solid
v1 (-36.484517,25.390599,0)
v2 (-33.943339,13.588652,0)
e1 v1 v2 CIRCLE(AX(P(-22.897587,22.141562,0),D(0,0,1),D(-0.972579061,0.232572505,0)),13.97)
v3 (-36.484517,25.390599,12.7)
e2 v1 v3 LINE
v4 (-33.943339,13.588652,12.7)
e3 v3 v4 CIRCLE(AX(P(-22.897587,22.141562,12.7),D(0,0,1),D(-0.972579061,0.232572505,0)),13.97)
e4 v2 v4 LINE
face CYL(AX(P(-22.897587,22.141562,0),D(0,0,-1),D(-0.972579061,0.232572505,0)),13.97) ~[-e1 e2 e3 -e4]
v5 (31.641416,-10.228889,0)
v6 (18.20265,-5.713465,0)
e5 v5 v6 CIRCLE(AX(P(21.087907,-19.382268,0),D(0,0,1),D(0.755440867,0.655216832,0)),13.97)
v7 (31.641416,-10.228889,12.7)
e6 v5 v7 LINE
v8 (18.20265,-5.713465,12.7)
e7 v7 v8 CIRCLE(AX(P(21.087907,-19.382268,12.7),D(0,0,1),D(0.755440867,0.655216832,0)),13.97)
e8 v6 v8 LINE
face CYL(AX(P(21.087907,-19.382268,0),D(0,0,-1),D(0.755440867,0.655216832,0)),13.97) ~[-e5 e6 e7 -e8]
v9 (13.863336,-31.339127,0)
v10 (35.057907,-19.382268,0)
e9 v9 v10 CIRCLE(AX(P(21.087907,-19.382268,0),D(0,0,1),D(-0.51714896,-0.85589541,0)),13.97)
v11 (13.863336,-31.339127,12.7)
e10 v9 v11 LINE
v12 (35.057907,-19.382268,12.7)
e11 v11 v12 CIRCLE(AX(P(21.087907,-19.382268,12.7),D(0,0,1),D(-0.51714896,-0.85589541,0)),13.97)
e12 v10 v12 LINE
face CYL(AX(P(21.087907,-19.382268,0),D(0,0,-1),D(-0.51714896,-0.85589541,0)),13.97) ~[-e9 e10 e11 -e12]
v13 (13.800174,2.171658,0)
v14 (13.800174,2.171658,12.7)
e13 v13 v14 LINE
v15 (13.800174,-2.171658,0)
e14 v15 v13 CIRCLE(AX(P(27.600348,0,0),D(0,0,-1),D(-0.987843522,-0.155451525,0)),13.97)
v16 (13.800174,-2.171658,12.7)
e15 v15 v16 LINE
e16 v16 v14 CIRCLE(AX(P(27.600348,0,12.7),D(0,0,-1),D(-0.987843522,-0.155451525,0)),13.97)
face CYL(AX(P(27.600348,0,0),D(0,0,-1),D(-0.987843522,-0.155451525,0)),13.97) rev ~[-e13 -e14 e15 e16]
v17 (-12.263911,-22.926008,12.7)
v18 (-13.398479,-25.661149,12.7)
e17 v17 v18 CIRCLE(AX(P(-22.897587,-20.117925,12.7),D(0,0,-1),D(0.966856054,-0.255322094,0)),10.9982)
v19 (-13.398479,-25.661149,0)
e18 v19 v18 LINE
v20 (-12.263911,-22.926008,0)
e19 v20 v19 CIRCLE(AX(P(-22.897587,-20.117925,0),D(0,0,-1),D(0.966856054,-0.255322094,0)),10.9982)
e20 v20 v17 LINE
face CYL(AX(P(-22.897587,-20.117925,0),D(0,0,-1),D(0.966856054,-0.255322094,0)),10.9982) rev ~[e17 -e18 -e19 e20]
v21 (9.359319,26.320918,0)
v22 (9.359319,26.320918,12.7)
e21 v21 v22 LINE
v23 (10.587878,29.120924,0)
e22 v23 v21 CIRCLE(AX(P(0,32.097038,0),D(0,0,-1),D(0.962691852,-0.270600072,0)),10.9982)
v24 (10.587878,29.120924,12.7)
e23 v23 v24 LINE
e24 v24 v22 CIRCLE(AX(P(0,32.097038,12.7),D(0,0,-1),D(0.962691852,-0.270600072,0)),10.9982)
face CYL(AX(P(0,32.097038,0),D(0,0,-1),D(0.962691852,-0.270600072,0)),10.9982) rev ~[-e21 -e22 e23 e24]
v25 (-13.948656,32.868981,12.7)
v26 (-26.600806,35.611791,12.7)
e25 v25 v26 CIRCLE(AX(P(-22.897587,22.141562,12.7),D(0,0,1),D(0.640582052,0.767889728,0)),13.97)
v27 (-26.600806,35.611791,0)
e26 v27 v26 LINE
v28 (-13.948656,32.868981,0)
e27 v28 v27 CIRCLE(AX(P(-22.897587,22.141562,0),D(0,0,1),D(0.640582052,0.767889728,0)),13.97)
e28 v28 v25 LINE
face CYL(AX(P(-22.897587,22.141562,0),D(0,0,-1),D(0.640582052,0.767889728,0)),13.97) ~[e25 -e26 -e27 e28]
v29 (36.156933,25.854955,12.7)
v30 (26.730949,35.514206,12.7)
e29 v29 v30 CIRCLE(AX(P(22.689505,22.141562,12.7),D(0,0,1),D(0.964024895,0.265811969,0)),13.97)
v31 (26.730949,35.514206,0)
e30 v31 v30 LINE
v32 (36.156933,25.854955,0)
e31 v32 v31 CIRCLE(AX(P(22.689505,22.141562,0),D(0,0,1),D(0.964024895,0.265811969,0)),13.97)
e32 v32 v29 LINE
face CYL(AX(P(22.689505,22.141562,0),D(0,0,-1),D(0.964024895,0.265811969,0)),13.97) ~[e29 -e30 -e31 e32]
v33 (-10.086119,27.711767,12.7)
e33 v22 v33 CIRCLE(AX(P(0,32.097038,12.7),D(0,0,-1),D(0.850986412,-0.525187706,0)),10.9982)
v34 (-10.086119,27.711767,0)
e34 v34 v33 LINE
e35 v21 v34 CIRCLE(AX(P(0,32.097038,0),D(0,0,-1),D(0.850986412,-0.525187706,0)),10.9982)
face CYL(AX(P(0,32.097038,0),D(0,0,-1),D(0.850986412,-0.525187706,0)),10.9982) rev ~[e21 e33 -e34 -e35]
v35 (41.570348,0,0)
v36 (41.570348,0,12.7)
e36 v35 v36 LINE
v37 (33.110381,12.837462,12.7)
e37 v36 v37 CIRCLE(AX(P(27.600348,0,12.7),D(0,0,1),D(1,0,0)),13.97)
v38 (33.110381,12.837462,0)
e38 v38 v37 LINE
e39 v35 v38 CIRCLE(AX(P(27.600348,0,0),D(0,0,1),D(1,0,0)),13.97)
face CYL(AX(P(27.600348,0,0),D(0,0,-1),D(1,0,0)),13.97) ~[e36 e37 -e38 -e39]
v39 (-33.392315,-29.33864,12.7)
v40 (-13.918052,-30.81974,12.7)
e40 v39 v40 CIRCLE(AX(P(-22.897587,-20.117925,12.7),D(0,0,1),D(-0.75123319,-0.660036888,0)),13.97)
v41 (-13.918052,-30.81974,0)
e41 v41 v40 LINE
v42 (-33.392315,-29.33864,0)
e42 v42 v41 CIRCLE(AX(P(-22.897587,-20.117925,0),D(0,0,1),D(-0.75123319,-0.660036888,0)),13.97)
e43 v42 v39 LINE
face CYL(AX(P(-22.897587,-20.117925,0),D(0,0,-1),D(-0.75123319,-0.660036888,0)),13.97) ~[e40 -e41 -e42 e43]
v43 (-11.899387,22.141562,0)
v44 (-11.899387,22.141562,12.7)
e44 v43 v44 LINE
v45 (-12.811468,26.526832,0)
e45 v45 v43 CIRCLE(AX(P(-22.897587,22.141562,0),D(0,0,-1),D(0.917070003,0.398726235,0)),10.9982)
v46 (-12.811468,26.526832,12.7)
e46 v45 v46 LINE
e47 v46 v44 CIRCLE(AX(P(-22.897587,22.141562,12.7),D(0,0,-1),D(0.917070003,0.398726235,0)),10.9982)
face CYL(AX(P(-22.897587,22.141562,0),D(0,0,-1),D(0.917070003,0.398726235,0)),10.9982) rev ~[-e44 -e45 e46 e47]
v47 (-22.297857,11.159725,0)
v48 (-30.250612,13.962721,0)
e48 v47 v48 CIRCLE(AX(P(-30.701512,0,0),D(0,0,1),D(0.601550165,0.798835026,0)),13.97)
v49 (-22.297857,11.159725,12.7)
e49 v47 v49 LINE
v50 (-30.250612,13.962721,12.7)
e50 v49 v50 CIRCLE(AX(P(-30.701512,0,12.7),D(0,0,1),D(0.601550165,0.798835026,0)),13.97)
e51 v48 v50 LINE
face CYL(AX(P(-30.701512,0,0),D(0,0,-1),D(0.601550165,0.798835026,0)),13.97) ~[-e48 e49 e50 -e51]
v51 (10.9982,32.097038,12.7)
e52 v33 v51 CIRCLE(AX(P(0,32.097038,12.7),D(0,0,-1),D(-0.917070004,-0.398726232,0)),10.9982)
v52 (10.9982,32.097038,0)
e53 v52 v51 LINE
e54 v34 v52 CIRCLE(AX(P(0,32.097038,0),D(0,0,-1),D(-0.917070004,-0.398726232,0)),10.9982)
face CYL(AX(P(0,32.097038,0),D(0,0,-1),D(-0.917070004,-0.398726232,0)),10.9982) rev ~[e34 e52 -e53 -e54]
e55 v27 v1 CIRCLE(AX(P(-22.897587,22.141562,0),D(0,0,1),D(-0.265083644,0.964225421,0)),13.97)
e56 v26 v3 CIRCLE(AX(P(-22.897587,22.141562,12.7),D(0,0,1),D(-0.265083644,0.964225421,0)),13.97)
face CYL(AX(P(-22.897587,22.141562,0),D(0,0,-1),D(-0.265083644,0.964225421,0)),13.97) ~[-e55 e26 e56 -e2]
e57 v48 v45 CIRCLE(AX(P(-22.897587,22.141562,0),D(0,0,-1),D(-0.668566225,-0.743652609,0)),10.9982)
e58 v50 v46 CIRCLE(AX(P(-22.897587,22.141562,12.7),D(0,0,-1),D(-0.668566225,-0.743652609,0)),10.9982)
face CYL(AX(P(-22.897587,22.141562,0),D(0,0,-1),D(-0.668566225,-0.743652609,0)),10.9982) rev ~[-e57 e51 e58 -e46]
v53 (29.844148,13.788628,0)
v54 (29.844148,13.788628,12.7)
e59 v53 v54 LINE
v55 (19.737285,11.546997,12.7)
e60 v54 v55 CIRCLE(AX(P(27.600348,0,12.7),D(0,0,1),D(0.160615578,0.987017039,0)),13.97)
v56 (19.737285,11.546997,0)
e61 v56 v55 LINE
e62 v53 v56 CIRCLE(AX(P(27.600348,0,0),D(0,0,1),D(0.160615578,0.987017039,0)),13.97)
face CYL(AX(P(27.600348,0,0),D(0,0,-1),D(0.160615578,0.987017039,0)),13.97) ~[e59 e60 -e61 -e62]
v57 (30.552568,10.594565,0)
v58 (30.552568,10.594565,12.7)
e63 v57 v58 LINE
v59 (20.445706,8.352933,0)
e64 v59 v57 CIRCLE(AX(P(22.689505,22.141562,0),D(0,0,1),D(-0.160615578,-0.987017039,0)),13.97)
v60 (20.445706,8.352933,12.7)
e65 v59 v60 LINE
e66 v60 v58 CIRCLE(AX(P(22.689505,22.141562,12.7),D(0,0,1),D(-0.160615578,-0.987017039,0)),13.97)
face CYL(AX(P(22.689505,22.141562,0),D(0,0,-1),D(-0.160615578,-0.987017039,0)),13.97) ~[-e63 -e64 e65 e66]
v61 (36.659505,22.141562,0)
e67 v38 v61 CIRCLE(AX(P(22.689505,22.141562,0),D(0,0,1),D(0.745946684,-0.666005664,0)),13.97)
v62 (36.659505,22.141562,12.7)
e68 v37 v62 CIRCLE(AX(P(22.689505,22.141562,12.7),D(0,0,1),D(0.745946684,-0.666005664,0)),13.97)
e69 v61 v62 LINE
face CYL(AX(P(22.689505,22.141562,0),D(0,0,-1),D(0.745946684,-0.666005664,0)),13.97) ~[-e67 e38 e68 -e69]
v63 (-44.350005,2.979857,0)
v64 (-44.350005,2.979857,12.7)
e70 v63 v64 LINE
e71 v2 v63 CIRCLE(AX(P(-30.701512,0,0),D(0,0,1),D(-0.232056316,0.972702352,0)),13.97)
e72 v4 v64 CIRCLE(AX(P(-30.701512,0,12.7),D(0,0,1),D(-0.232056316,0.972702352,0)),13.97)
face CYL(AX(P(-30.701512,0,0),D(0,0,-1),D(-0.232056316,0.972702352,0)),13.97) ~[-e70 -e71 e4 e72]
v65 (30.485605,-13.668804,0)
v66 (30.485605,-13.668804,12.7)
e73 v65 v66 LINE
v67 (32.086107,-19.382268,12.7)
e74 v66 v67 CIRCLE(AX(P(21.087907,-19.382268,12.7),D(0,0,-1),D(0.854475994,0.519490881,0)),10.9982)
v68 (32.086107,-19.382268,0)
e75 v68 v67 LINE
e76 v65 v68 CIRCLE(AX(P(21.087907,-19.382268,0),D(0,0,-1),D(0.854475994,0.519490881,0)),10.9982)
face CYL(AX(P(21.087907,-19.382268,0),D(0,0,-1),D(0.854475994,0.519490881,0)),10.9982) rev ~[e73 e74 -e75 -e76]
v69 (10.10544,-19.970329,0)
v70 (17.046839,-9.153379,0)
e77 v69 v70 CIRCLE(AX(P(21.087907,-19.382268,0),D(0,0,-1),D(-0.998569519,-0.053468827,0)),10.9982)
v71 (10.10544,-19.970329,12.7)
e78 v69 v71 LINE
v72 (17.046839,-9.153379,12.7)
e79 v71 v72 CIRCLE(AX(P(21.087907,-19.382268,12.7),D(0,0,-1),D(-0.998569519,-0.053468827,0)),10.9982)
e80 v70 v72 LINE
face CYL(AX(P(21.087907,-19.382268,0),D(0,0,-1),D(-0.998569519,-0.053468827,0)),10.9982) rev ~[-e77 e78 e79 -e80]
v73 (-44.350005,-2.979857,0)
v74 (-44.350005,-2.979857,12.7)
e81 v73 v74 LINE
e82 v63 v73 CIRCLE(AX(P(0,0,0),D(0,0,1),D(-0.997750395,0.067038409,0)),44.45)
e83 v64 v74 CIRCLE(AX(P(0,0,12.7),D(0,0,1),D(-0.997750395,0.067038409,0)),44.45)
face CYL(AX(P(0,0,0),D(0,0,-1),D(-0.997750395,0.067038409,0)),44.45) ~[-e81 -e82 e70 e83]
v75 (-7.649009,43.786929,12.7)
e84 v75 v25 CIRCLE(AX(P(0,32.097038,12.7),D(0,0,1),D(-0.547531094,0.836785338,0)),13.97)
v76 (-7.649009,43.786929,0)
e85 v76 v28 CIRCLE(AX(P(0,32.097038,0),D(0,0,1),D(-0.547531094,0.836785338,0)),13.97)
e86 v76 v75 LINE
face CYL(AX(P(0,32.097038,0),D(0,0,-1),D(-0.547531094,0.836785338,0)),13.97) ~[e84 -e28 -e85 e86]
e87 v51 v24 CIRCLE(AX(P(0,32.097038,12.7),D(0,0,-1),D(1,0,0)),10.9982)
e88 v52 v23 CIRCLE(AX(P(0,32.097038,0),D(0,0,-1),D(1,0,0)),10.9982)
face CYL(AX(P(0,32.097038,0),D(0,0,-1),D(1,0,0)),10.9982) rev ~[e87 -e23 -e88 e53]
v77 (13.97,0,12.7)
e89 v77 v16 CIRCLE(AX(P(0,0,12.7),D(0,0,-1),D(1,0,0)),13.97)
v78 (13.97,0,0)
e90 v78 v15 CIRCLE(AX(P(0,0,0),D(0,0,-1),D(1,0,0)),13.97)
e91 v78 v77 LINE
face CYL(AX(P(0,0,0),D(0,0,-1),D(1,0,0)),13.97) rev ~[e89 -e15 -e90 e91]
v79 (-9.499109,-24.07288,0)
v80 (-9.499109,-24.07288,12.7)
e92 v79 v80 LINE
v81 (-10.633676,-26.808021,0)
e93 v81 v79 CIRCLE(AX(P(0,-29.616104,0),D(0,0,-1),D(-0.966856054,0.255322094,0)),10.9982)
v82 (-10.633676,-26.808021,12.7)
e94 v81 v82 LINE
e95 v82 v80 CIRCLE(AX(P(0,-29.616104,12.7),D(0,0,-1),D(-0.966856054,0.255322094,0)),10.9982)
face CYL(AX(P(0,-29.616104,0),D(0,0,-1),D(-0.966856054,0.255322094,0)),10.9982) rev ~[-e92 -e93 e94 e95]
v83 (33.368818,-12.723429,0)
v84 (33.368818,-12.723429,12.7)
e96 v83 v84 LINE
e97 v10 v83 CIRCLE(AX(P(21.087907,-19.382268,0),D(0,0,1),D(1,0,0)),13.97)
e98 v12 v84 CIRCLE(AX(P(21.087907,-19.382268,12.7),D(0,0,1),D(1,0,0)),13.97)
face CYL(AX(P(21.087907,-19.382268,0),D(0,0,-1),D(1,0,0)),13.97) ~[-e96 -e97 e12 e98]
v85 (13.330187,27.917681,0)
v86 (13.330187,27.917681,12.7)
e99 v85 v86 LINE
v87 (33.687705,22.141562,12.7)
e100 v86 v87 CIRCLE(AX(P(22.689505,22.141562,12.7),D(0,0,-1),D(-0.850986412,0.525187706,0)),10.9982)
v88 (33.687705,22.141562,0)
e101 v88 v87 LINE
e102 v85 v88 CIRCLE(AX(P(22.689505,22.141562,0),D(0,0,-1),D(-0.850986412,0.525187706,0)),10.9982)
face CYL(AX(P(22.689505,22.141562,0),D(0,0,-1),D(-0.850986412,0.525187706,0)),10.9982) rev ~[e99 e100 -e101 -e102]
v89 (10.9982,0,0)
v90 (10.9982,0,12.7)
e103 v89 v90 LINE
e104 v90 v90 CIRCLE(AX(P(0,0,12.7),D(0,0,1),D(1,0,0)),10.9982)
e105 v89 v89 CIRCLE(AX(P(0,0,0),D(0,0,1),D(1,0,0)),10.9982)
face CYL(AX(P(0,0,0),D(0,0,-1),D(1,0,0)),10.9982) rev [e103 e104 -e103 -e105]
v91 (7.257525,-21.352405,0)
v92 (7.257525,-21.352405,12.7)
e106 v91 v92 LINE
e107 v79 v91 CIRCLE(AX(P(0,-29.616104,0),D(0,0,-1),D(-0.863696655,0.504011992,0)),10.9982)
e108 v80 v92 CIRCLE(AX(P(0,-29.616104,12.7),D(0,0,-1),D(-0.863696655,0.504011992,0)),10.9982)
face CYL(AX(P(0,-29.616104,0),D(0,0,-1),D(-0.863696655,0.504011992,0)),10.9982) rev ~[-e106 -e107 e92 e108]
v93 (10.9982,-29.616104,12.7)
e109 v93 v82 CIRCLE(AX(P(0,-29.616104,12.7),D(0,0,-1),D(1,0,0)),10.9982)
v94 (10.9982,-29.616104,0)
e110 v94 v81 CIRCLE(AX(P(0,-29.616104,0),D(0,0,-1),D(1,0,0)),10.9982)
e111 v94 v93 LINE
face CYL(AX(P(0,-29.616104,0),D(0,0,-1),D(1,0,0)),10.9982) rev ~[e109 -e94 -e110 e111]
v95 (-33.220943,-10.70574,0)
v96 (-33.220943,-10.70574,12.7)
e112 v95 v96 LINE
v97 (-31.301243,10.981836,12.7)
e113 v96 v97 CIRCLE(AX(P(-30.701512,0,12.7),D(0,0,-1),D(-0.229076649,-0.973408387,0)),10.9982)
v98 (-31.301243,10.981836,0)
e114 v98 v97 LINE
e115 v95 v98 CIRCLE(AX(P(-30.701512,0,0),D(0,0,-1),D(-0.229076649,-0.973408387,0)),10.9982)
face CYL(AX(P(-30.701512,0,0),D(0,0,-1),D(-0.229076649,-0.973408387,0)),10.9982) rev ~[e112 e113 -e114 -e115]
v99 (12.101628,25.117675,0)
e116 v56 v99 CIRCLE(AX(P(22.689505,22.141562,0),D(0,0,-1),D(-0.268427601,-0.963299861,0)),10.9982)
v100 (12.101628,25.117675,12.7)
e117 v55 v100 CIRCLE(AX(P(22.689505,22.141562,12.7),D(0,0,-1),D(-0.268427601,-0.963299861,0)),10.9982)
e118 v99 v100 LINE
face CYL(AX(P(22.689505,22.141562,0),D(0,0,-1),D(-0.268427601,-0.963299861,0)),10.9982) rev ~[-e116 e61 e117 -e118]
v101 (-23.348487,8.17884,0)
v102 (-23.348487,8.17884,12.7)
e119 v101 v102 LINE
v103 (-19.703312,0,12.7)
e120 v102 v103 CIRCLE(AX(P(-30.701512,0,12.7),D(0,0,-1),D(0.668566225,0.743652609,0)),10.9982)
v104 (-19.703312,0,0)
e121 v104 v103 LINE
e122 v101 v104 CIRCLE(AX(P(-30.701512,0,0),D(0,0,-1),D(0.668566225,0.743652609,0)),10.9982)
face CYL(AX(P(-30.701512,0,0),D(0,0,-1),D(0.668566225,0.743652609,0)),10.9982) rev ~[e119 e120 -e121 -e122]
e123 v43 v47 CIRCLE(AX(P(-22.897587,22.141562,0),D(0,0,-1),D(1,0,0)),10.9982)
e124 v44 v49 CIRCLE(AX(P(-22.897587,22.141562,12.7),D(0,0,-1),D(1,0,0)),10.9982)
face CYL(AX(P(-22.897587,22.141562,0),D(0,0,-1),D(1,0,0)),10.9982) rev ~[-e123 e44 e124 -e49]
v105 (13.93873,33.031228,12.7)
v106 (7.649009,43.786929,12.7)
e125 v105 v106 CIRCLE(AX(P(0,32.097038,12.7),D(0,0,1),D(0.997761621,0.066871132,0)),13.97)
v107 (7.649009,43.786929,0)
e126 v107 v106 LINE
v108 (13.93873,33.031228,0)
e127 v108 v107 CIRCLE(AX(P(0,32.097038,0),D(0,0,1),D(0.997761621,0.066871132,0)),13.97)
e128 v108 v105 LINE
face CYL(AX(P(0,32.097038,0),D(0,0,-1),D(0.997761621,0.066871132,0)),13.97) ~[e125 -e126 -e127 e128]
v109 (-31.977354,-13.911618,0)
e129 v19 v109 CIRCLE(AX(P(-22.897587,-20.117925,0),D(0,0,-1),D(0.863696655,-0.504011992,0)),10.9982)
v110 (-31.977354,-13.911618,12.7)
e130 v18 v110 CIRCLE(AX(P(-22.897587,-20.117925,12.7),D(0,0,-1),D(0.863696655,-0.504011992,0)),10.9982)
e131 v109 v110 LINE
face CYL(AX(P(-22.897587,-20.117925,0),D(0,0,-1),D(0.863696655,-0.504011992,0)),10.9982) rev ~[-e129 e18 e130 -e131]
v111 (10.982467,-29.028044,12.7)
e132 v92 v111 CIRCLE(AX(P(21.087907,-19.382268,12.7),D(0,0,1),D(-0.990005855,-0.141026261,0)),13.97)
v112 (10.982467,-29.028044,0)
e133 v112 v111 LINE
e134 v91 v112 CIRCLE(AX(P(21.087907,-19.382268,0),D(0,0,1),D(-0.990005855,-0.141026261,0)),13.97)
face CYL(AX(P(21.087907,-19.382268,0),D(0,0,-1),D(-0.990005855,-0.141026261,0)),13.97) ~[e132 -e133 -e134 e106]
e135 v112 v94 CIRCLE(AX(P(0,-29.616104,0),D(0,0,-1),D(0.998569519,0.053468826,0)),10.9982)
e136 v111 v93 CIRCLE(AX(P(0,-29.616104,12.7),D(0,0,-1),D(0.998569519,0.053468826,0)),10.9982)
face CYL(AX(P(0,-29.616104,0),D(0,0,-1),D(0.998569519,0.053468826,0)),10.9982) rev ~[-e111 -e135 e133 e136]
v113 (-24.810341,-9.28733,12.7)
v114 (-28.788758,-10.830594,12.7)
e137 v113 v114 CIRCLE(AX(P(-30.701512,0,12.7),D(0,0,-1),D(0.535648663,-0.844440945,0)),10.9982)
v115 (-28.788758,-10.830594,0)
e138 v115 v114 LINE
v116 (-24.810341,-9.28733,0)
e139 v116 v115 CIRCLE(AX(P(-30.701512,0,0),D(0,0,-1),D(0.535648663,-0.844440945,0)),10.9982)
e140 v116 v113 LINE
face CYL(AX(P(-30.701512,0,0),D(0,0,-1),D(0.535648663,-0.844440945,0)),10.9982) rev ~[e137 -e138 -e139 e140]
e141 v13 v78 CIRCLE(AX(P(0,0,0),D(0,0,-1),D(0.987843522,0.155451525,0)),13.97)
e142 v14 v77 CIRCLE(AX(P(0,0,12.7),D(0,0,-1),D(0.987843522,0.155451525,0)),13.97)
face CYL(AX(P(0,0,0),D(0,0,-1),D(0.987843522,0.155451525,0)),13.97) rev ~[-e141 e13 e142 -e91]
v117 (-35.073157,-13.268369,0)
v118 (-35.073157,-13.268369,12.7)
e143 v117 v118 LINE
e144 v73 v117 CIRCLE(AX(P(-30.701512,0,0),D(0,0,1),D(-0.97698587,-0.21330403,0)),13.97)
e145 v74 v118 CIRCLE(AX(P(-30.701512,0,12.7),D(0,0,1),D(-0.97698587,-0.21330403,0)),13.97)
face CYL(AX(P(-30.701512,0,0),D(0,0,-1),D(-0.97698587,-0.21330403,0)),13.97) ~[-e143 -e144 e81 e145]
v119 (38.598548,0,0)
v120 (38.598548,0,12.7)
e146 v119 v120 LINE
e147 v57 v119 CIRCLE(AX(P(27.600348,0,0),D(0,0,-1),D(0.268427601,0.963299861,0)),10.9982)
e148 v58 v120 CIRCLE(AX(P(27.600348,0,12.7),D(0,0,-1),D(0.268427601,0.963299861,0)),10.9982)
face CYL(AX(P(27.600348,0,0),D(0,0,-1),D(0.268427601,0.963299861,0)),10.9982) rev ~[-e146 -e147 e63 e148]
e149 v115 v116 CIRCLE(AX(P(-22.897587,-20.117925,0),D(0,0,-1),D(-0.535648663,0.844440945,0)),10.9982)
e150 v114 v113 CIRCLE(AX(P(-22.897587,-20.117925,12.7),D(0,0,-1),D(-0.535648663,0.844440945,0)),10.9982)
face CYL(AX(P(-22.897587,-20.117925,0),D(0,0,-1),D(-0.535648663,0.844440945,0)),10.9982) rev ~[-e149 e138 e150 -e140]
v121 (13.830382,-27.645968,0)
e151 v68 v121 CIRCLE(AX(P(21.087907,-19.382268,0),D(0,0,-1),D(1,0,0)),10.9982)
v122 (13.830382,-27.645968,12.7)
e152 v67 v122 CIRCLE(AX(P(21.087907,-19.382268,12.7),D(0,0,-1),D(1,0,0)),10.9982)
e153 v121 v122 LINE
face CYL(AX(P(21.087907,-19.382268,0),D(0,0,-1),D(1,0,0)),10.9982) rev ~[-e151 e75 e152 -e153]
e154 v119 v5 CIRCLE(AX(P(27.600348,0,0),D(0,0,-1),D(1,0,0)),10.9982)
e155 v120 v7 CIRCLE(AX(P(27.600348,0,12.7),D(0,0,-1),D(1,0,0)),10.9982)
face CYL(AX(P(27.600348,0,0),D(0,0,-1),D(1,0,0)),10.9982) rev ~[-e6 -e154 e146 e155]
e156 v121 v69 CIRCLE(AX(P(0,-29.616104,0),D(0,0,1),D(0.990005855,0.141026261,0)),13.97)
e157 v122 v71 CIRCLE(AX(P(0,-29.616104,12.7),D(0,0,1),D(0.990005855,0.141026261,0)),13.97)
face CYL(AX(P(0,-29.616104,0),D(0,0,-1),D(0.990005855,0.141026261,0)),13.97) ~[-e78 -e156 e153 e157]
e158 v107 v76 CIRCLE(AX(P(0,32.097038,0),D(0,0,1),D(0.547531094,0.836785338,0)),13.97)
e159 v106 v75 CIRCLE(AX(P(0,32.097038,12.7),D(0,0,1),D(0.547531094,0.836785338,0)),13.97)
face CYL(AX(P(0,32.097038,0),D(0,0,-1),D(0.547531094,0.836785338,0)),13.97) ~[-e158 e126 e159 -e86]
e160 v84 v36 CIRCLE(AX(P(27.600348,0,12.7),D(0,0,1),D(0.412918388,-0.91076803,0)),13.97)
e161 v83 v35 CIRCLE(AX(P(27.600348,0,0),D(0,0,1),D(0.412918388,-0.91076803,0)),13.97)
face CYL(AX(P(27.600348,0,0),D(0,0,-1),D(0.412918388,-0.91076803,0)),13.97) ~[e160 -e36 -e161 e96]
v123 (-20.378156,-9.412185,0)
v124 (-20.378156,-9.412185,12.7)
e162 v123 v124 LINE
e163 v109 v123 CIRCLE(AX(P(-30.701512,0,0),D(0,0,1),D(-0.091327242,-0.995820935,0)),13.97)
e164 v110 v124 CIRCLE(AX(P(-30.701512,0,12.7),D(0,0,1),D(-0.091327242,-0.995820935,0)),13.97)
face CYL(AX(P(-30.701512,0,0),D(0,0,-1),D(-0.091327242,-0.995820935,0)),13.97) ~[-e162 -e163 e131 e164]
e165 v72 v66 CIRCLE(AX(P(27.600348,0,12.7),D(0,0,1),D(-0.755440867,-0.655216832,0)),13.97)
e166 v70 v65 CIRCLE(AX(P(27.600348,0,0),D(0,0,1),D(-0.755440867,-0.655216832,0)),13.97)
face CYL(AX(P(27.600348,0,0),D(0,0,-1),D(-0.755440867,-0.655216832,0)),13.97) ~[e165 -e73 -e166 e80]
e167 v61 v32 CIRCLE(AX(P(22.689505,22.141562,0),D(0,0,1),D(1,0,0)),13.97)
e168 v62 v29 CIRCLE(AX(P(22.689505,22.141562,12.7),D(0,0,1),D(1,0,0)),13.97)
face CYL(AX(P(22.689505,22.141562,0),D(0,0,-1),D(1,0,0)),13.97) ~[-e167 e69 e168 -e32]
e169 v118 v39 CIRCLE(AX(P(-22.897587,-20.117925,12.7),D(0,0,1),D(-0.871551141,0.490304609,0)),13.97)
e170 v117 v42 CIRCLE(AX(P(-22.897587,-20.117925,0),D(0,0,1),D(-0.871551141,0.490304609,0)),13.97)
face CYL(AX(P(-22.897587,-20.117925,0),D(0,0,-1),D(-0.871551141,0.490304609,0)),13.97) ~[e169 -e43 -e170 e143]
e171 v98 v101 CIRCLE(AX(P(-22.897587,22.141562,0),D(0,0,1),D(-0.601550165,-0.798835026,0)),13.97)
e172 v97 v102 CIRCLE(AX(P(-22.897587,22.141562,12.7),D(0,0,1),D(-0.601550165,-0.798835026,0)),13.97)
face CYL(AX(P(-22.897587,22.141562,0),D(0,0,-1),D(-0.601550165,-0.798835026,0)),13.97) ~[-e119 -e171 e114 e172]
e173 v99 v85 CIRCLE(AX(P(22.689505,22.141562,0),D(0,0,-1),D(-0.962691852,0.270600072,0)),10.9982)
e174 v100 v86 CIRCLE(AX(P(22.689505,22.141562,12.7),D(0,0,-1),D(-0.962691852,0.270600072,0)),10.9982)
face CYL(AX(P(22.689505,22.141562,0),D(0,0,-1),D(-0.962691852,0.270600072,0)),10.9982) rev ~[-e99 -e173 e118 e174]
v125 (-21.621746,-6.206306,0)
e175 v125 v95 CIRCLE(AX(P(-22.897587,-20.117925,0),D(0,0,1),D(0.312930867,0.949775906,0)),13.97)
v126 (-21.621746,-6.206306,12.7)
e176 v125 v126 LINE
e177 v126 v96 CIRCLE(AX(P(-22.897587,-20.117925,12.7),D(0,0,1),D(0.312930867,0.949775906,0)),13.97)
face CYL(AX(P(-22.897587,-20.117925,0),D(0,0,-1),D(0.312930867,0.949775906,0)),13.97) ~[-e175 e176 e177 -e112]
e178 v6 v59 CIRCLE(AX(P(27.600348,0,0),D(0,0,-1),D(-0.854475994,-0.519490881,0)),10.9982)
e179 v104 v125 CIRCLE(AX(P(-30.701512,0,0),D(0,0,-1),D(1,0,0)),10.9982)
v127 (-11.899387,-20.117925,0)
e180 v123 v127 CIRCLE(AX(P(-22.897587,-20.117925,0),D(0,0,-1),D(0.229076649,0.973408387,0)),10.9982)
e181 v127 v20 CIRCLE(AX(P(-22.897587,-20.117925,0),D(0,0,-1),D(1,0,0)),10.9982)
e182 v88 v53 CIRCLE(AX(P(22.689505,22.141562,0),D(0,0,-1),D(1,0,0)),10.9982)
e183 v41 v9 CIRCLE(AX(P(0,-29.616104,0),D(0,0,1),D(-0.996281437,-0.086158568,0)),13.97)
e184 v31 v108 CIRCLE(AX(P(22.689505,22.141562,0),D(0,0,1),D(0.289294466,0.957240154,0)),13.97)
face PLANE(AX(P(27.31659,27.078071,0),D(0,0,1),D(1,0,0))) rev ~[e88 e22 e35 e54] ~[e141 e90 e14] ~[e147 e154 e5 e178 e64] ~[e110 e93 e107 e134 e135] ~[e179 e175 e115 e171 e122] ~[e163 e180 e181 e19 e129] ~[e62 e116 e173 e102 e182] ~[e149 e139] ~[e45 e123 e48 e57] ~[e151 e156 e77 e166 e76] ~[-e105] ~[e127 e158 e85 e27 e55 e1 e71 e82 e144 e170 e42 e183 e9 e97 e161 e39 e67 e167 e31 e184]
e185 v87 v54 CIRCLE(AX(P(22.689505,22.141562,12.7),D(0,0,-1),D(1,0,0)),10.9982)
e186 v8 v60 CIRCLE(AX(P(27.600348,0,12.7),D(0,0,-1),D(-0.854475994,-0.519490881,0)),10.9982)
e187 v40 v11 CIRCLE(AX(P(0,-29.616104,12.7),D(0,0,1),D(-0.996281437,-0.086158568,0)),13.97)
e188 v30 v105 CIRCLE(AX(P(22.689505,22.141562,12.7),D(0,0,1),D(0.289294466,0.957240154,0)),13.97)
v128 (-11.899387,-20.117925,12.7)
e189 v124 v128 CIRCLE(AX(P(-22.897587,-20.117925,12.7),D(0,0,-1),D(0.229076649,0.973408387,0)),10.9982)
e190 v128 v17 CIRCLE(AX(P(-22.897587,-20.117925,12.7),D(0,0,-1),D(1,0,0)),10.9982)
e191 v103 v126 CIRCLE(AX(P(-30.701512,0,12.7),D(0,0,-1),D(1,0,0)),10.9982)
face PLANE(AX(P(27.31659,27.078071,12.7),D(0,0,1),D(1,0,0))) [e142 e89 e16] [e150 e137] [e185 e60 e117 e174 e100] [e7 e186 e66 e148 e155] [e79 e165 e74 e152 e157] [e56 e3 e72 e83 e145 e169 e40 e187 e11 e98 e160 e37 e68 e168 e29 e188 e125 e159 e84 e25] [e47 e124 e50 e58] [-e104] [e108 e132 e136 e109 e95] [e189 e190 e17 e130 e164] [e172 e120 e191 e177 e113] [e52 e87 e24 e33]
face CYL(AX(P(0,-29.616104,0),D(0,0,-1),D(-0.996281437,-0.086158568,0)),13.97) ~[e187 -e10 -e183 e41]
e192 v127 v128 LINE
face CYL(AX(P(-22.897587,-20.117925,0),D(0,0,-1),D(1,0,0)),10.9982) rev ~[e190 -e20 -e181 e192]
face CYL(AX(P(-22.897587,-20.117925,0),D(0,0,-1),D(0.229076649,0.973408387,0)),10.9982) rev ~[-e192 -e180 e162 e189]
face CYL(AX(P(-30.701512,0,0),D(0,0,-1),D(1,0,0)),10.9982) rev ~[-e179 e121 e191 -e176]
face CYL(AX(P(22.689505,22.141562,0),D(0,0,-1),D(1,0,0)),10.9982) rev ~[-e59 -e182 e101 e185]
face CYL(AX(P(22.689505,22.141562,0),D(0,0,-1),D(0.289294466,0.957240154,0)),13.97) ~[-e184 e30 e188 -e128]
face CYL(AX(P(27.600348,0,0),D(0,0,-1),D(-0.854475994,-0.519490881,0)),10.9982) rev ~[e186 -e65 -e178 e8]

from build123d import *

# Parameters (mm, degrees)
F0_R     = 10.9982
F1_DEPTH = 12.7


with BuildPart() as f1:
    # F0 (on Top) → F1 (new body)
    with BuildSketch(Plane.XY):
        with BuildLine():
            ThreePointArc((36.6595053904, 22.1415615255), (36.5332921925, 24.0151855477), (36.1569331676, 25.8549547266))
            ThreePointArc((36.1569331676, 25.8549547266), (31.8126817374, 31.044416256), (26.7309490751, 35.514206475))
            ThreePointArc((26.7309490751, 35.514206475), (20.0275986163, 35.8556109759), (13.9387298404, 33.0312276028))
            ThreePointArc((13.9387298404, 33.0312276028), (13.9621802716, 32.5643943457), (13.97, 32.0970378816))
            ThreePointArc((13.97, 32.0970378816), (13.809120306, 29.9830141416), (13.3301866323, 27.9176809516))
            ThreePointArc((13.3301866323, 27.9176809516), (25.6915666552, 32.7221111995), (33.6877053904, 22.1415615255))
            ThreePointArc((33.6877053904, 22.1415615255), (32.6807162633, 17.5441591575), (29.8441476203, 13.7886280407))
            ThreePointArc((29.8441476203, 13.7886280407), (31.5063251421, 13.4128387201), (33.1103805724, 12.8374624052))
            ThreePointArc((33.1103805724, 12.8374624052), (35.7421014213, 17.1625418576), (36.6595053904, 22.1415615255))
        make_face()
        with BuildLine():
            ThreePointArc((26.7309490751, 35.514206475), (31.8126817374, 31.044416256), (36.1569331676, 25.8549547266))
            ThreePointArc((36.1569331676, 25.8549547266), (32.6877767936, 31.8983780631), (26.7309490751, 35.514206475))
        make_face()
        with BuildLine():
            ThreePointArc((-35.0731566807, -13.2683694138), (-36.7917944171, -21.5711650181), (-33.3923149137, -29.3386401304))
            ThreePointArc((-33.3923149137, -29.3386401304), (-23.9570048726, -34.0476963086), (-13.9180516707, -30.8197396373))
            ThreePointArc((-13.9180516707, -30.8197396373), (-13.8996752079, -28.2161297549), (-13.3984786946, -25.661149487))
            ThreePointArc((-13.3984786946, -25.661149487), (-28.776093154, -29.4132769471), (-31.9773540352, -13.9116184645))
            ThreePointArc((-31.9773540352, -13.9116184645), (-33.5435128628, -13.6778629095), (-35.0731566807, -13.2683694138))
        make_face()
        with BuildLine():
            ThreePointArc((-44.3500050785, 2.9798573019), (-44.45, 0), (-44.3500050785, -2.9798573019))
            ThreePointArc((-44.3500050785, -2.9798573019), (-41.0767090039, -9.3550091876), (-35.0731566807, -13.2683694138))
            ThreePointArc((-35.0731566807, -13.2683694138), (-34.2197857507, -11.9344829162), (-33.2209432758, -10.7057401266))
            ThreePointArc((-33.2209432758, -10.7057401266), (-41.6568779936, 0.9697265091), (-31.3012430481, 10.9818362069))
            ThreePointArc((-31.3012430481, 10.9818362069), (-32.7092505873, 12.1971076688), (-33.9433392044, 13.5886518621))
            ThreePointArc((-33.9433392044, 13.5886518621), (-40.6743431807, 9.7828190024), (-44.3500050785, 2.9798573019))
        make_face()
        with BuildLine():
            ThreePointArc((-33.2209432758, -10.7057401266), (-34.2197857507, -11.9344829162), (-35.0731566807, -13.2683694138))
            ThreePointArc((-35.0731566807, -13.2683694138), (-33.5435128628, -13.6778629095), (-31.9773540352, -13.9116184645))
            ThreePointArc((-31.9773540352, -13.9116184645), (-30.5399313145, -12.2087541474), (-28.7887583748, -10.8305943977))
            ThreePointArc((-28.7887583748, -10.8305943977), (-31.0112079738, -10.9938388171), (-33.2209432758, -10.7057401266))
        make_face()
        with BuildLine():
            ThreePointArc((-13.3984786946, -25.661149487), (-13.8996752079, -28.2161297549), (-13.9180516707, -30.8197396373))
            ThreePointArc((-13.9180516707, -30.8197396373), (-12.0881248548, -28.9675814469), (-10.6336762496, -26.8080209895))
            ThreePointArc((-10.6336762496, -26.8080209895), (-10.15886339, -25.4020923525), (-9.4991085531, -24.0728797514))
            ThreePointArc((-9.4991085531, -24.0728797514), (-9.0712058092, -22.1159428971), (-8.9275872476, -20.1179247995))
            ThreePointArc((-8.9275872476, -20.1179247995), (-8.9405803722, -19.5155469447), (-8.9795355769, -18.9142896011))
            ThreePointArc((-8.9795355769, -18.9142896011), (-10.8094623929, -20.7664477915), (-12.2639109981, -22.9260082489))
            ThreePointArc((-12.2639109981, -22.9260082489), (-12.7387238577, -24.3319368858), (-13.3984786946, -25.661149487))
        make_face()
        with BuildLine():
            ThreePointArc((-10.6336762496, -26.8080209895), (-12.0881248548, -28.9675814469), (-13.9180516707, -30.8197396373))
            ThreePointArc((-13.9180516707, -30.8197396373), (-0.2611307533, -43.5836636648), (13.8633362869, -31.3391270727))
            ThreePointArc((13.8633362869, -31.3391270727), (12.3461913769, -30.279208289), (10.9824672855, -29.0280435884))
            ThreePointArc((10.9824672855, -29.0280435884), (10.9942661178, -29.321968806), (10.9982, -29.6161044389))
            ThreePointArc((10.9982, -29.6161044389), (-1.415822219, -40.5227927852), (-10.6336762496, -26.8080209895))
        make_face()
        with BuildLine():
            ThreePointArc((13.9387298404, 33.0312276028), (12.059390514, 39.1491298005), (7.6490093808, 43.7869290484))
            ThreePointArc((7.6490093808, 43.7869290484), (0, 44.45), (-7.6490093808, 43.7869290484))
            ThreePointArc((-7.6490093808, 43.7869290484), (-12.1002142351, 39.0788510748), (-13.9486559845, 32.8689810311))
            ThreePointArc((-13.9486559845, 32.8689810311), (-11.7159971411, 30.5161028675), (-10.0861193168, 27.7117670386))
            ThreePointArc((-10.0861193168, 27.7117670386), (-2.2395586362, 42.8648036831), (10.9982, 32.0970378816))
            ThreePointArc((10.9982, 32.0970378816), (10.8951364792, 30.594904619), (10.587877522, 29.1209241709))
            ThreePointArc((10.587877522, 29.1209241709), (12.0815696669, 31.2318090297), (13.9387298404, 33.0312276028))
        make_face()
        with BuildLine():
            ThreePointArc((-7.6490093808, 43.7869290484), (0, 44.45), (7.6490093808, 43.7869290484))
            ThreePointArc((7.6490093808, 43.7869290484), (0, 46.0670378816), (-7.6490093808, 43.7869290484))
        make_face()
        with BuildLine():
            ThreePointArc((13.97, 32.0970378816), (13.9621802716, 32.5643943457), (13.9387298404, 33.0312276028))
            ThreePointArc((13.9387298404, 33.0312276028), (12.0815696669, 31.2318090297), (10.587877522, 29.1209241709))
            ThreePointArc((10.587877522, 29.1209241709), (10.0713786475, 27.678018151), (9.3593187581, 26.3209184555))
            ThreePointArc((9.3593187581, 26.3209184555), (8.8173915919, 23.7924275898), (8.7507755499, 21.2073718043))
            ThreePointArc((8.7507755499, 21.2073718043), (10.6079357234, 23.0067903774), (12.1016278684, 25.1176752363))
            ThreePointArc((12.1016278684, 25.1176752363), (12.6181267429, 26.5605812561), (13.3301866323, 27.9176809516))
            ThreePointArc((13.3301866323, 27.9176809516), (13.809120306, 29.9830141416), (13.97, 32.0970378816))
        make_face()
        with BuildLine():
            ThreePointArc((30.5525684391, 10.5945645354), (31.9000019579, 11.6378644155), (33.1103805724, 12.8374624052))
            ThreePointArc((33.1103805724, 12.8374624052), (31.5063251421, 13.4128387201), (29.8441476203, 13.7886280407))
            ThreePointArc((29.8441476203, 13.7886280407), (25.0709576069, 11.4042858664), (19.737284947, 11.5469969902))
            ThreePointArc((19.737284947, 11.5469969902), (18.3898514282, 10.5036971101), (17.1794728138, 9.3040991203))
            ThreePointArc((17.1794728138, 9.3040991203), (18.7835282441, 8.7287228054), (20.4457057658, 8.3529334848))
            ThreePointArc((20.4457057658, 8.3529334848), (25.2188957792, 10.7372756591), (30.5525684391, 10.5945645354))
        make_face()
        with BuildLine():
            ThreePointArc((41.5703479958, 0), (39.2651680779, 7.6871888524), (33.1103805724, 12.8374624052))
            ThreePointArc((33.1103805724, 12.8374624052), (31.9000019579, 11.6378644155), (30.5525684391, 10.5945645354))
            ThreePointArc((30.5525684391, 10.5945645354), (36.3590440779, 6.6517400866), (38.5985479958, 0))
            ThreePointArc((38.5985479958, 0), (36.6944361636, -6.1853022267), (31.6414161677, -10.2288890535))
            ThreePointArc((31.6414161677, -10.2288890535), (32.5730438121, -11.4291217528), (33.3688178772, -12.7234293815))
            ThreePointArc((33.3688178772, -12.7234293815), (39.3422904297, -7.5688630506), (41.5703479958, 0))
        make_face()
        with BuildLine():
            ThreePointArc((-28.7887583748, -10.8305943977), (-30.5399313145, -12.2087541474), (-31.9773540352, -13.9116184645))
            ThreePointArc((-31.9773540352, -13.9116184645), (-25.6492253052, -13.0244114798), (-20.3781564427, -9.4121846728))
            ThreePointArc((-20.3781564427, -9.4121846728), (-22.5878917447, -9.1240859824), (-24.8103413437, -9.2873304017))
            ThreePointArc((-24.8103413437, -9.2873304017), (-26.7239845749, -10.2537639468), (-28.7887583748, -10.8305943977))
        make_face()
        with BuildLine():
            ThreePointArc((-21.6217456833, -6.2063063349), (-27.9498744133, -7.0935133196), (-33.2209432758, -10.7057401266))
            ThreePointArc((-33.2209432758, -10.7057401266), (-31.0112079738, -10.9938388171), (-28.7887583748, -10.8305943977))
            ThreePointArc((-28.7887583748, -10.8305943977), (-26.8751151435, -9.8641608526), (-24.8103413437, -9.2873304017))
            ThreePointArc((-24.8103413437, -9.2873304017), (-23.059168404, -7.9091706521), (-21.6217456833, -6.2063063349))
        make_face()
        with BuildLine():
            ThreePointArc((10.9824672855, -29.0280435884), (12.3461913769, -30.279208289), (13.8633362869, -31.3391270727))
            ThreePointArc((13.8633362869, -31.3391270727), (13.9433085731, -30.4792649315), (13.97, -29.6161044389))
            ThreePointArc((13.97, -29.6161044389), (13.9350517356, -28.628565515), (13.8303818001, -27.6459675748))
            ThreePointArc((13.8303818001, -27.6459675748), (11.1933031436, -24.1840608478), (10.1054399692, -19.9703290409))
            ThreePointArc((10.1054399692, -19.9703290409), (8.7417158778, -18.7191643403), (7.2245709678, -17.6592455566))
            ThreePointArc((7.2245709678, -17.6592455566), (7.118463381, -19.5069191441), (7.2575254546, -21.3524050545))
            ThreePointArc((7.2575254546, -21.3524050545), (9.8946041111, -24.8143117814), (10.9824672855, -29.0280435884))
        make_face()
        with BuildLine():
            ThreePointArc((13.97, -29.6161044389), (13.9433085731, -30.4792649315), (13.8633362869, -31.3391270727))
            ThreePointArc((13.8633362869, -31.3391270727), (27.952076672, -31.5496047194), (35.0579072547, -19.3822681904))
            ThreePointArc((35.0579072547, -19.3822681904), (34.6290523576, -15.9474043937), (33.3688178772, -12.7234293815))
            ThreePointArc((33.3688178772, -12.7234293815), (31.9529542163, -13.2746268908), (30.4856051307, -13.6688035784))
            ThreePointArc((30.4856051307, -13.6688035784), (31.6784257505, -16.4155661106), (32.0861072547, -19.3822681904))
            ThreePointArc((32.0861072547, -19.3822681904), (25.6233612995, -29.4017522014), (13.8303818001, -27.6459675748))
            ThreePointArc((13.8303818001, -27.6459675748), (13.9350517356, -28.628565515), (13.97, -29.6161044389))
        make_face()
        with BuildLine():
            ThreePointArc((19.737284947, 11.5469969902), (25.0709576069, 11.4042858664), (29.8441476203, 13.7886280407))
            ThreePointArc((29.8441476203, 13.7886280407), (24.5754086907, 13.6385718534), (19.737284947, 11.5469969902))
        make_face()
        with BuildLine():
            ThreePointArc((20.4457057658, 8.3529334848), (25.7144446954, 8.5029896721), (30.5525684391, 10.5945645354))
            ThreePointArc((30.5525684391, 10.5945645354), (25.2188957792, 10.7372756591), (20.4457057658, 8.3529334848))
        make_face()
        with BuildLine():
            ThreePointArc((-26.6008057499, 35.6117906522), (-32.9402707471, 31.8526586896), (-36.4845167296, 25.390599422))
            ThreePointArc((-36.4845167296, 25.390599422), (-31.9539929528, 30.898945522), (-26.6008057499, 35.6117906522))
        make_face()
        with BuildLine():
            ThreePointArc((-26.6008057499, 35.6117906522), (-31.9539929528, 30.898945522), (-36.4845167296, 25.390599422))
            ThreePointArc((-36.4845167296, 25.390599422), (-36.554590589, 19.200956191), (-33.9433392044, 13.5886518621))
            ThreePointArc((-33.9433392044, 13.5886518621), (-32.1094541548, 13.8988704654), (-30.2506123073, 13.9627214053))
            ThreePointArc((-30.2506123073, 13.9627214053), (-29.326558574, 31.0650547274), (-12.8114679451, 26.5268324014))
            ThreePointArc((-12.8114679451, 26.5268324014), (-13.7507007273, 29.6314488023), (-13.9486559845, 32.8689810311))
            ThreePointArc((-13.9486559845, 32.8689810311), (-19.9378361185, 35.7944283766), (-26.6008057499, 35.6117906522))
        make_face()
        with BuildLine():
            ThreePointArc((-30.2506123073, 13.9627214053), (-32.1094541548, 13.8988704654), (-33.9433392044, 13.5886518621))
            ThreePointArc((-33.9433392044, 13.5886518621), (-32.7092505873, 12.1971076688), (-31.3012430481, 10.9818362069))
            ThreePointArc((-31.3012430481, 10.9818362069), (-27.0455661697, 10.3727749365), (-23.3484874112, 8.1788401202))
            ThreePointArc((-23.3484874112, 8.1788401202), (-21.4896455636, 8.2426910601), (-19.6557605141, 8.5529096634))
            ThreePointArc((-19.6557605141, 8.5529096634), (-20.8898491312, 9.9444538567), (-22.2978566704, 11.1597253186))
            ThreePointArc((-22.2978566704, 11.1597253186), (-26.5535335488, 11.768786589), (-30.2506123073, 13.9627214053))
        make_face()
        with BuildLine():
            ThreePointArc((-18.5259430378, -6.8495553856), (-19.3793139677, -8.1834418832), (-20.3781564427, -9.4121846728))
            ThreePointArc((-20.3781564427, -9.4121846728), (-14.2758238805, -13.289630746), (-11.8993872476, -20.1179247995))
            ThreePointArc((-11.8993872476, -20.1179247995), (-11.9908989013, -21.5337470185), (-12.2639109981, -22.9260082489))
            ThreePointArc((-12.2639109981, -22.9260082489), (-10.8094623929, -20.7664477915), (-8.9795355769, -18.9142896011))
            ThreePointArc((-8.9795355769, -18.9142896011), (-11.9423283838, -11.4494068623), (-18.5259430378, -6.8495553856))
        make_face()
        with BuildLine():
            ThreePointArc((-24.8103413437, -9.2873304017), (-22.5878917447, -9.1240859824), (-20.3781564427, -9.4121846728))
            ThreePointArc((-20.3781564427, -9.4121846728), (-19.3793139677, -8.1834418832), (-18.5259430378, -6.8495553856))
            ThreePointArc((-18.5259430378, -6.8495553856), (-20.0555868557, -6.4400618899), (-21.6217456833, -6.2063063349))
            ThreePointArc((-21.6217456833, -6.2063063349), (-23.059168404, -7.9091706521), (-24.8103413437, -9.2873304017))
        make_face()
        with BuildLine():
            ThreePointArc((-23.3484874112, 8.1788401202), (-27.0455661697, 10.3727749365), (-31.3012430481, 10.9818362069))
            ThreePointArc((-31.3012430481, 10.9818362069), (-27.5413989466, 8.9659813522), (-23.3484874112, 8.1788401202))
        make_face()
        with BuildLine():
            ThreePointArc((-19.7033124708, 0), (-20.1938606322, -3.248023411), (-21.6217456833, -6.2063063349))
            ThreePointArc((-21.6217456833, -6.2063063349), (-20.0555868557, -6.4400618899), (-18.5259430378, -6.8495553856))
            ThreePointArc((-18.5259430378, -6.8495553856), (-17.187564029, -3.5403527381), (-16.7315124708, 0))
            ThreePointArc((-16.7315124708, 0), (-17.4827747316, 4.5194991517), (-19.6557605141, 8.5529096634))
            ThreePointArc((-19.6557605141, 8.5529096634), (-21.4896455636, 8.2426910601), (-23.3484874112, 8.1788401202))
            ThreePointArc((-23.3484874112, 8.1788401202), (-20.655855612, 4.4771845522), (-19.7033124708, 0))
        make_face()
        with BuildLine():
            ThreePointArc((-8.9275872476, -20.1179247995), (-9.0712058092, -22.1159428971), (-9.4991085531, -24.0728797514))
            ThreePointArc((-9.4991085531, -24.0728797514), (-1.7625037137, -18.760046964), (7.2575254546, -21.3524050545))
            ThreePointArc((7.2575254546, -21.3524050545), (7.118463381, -19.5069191441), (7.2245709678, -17.6592455566))
            ThreePointArc((7.2245709678, -17.6592455566), (-1.0787766605, -15.6878187972), (-8.9795355769, -18.9142896011))
            ThreePointArc((-8.9795355769, -18.9142896011), (-8.9405803722, -19.5155469447), (-8.9275872476, -20.1179247995))
        make_face()
        with BuildLine():
            ThreePointArc((7.2575254546, -21.3524050545), (8.5197034185, -25.4815429285), (10.9824672855, -29.0280435884))
            ThreePointArc((10.9824672855, -29.0280435884), (9.8946041111, -24.8143117814), (7.2575254546, -21.3524050545))
        make_face()
        with BuildLine():
            ThreePointArc((-10.0861193168, 27.7117670386), (-11.7159971411, 30.5161028675), (-13.9486559845, 32.8689810311))
            ThreePointArc((-13.9486559845, 32.8689810311), (-13.7507007273, 29.6314488023), (-12.8114679451, 26.5268324014))
            ThreePointArc((-12.8114679451, 26.5268324014), (-11.1815901173, 23.7224965539), (-8.9489312631, 21.3696183761))
            ThreePointArc((-8.9489312631, 21.3696183761), (-8.932924271, 21.75544244), (-8.9275872476, 22.1415615255))
            ThreePointArc((-8.9275872476, 22.1415615255), (-9.2202865821, 24.9862665196), (-10.0861193168, 27.7117670386))
        make_face()
        with BuildLine():
            ThreePointArc((8.7507755499, 21.2073718043), (8.8173915919, 23.7924275898), (9.3593187581, 26.3209184555))
            ThreePointArc((9.3593187581, 26.3209184555), (-0.7846494175, 21.1268633829), (-10.0861193168, 27.7117670386))
            ThreePointArc((-10.0861193168, 27.7117670386), (-9.2202865821, 24.9862665196), (-8.9275872476, 22.1415615255))
            ThreePointArc((-8.9275872476, 22.1415615255), (-8.932924271, 21.75544244), (-8.9489312631, 21.3696183761))
            ThreePointArc((-8.9489312631, 21.3696183761), (-6.6028466768, 19.7859324981), (-3.9856875286, 18.707669154))
            ThreePointArc((-3.9856875286, 18.707669154), (2.6904728762, 18.3885640168), (8.7507755499, 21.2073718043))
        make_face()
        with BuildLine():
            ThreePointArc((30.4856051307, -13.6688035784), (31.9529542163, -13.2746268908), (33.3688178772, -12.7234293815))
            ThreePointArc((33.3688178772, -12.7234293815), (32.5730438121, -11.4291217528), (31.6414161677, -10.2288890535))
            ThreePointArc((31.6414161677, -10.2288890535), (29.9449474712, -10.7453830336), (28.1875230343, -10.9825146808))
            ThreePointArc((28.1875230343, -10.9825146808), (29.4452020606, -12.2327208784), (30.4856051307, -13.6688035784))
        make_face()
        with BuildLine():
            ThreePointArc((17.1794728138, 9.3040991203), (18.3898514282, 10.5036971101), (19.737284947, 11.5469969902))
            ThreePointArc((19.737284947, 11.5469969902), (13.1043924415, 16.7484165249), (12.1016278684, 25.1176752363))
            ThreePointArc((12.1016278684, 25.1176752363), (10.6079357234, 23.0067903774), (8.7507755499, 21.2073718043))
            ThreePointArc((8.7507755499, 21.2073718043), (11.288384172, 14.0684372874), (17.1794728138, 9.3040991203))
        make_face()
        with BuildLine():
            ThreePointArc((18.2026501198, -5.713464612), (16.7393683162, 1.731913289), (20.4457057658, 8.3529334848))
            ThreePointArc((20.4457057658, 8.3529334848), (18.7835282441, 8.7287228054), (17.1794728138, 9.3040991203))
            ThreePointArc((17.1794728138, 9.3040991203), (14.9756604504, 5.9814851318), (13.8001739979, 2.1716578064))
            ThreePointArc((13.8001739979, 2.1716578064), (13.9274787875, 1.0891439872), (13.97, 0))
            ThreePointArc((13.97, 0), (13.9274787875, -1.0891439872), (13.8001739979, -2.1716578064))
            ThreePointArc((13.8001739979, -2.1716578064), (14.3682112794, -4.4801180698), (15.3194373733, -6.6588388088))
            ThreePointArc((15.3194373733, -6.6588388088), (16.7353010341, -6.1076412996), (18.2026501198, -5.713464612))
        make_face()
        with BuildLine():
            ThreePointArc((-22.2978566704, 11.1597253186), (-26.0577007719, 13.1755801734), (-30.2506123073, 13.9627214053))
            ThreePointArc((-30.2506123073, 13.9627214053), (-26.5535335488, 11.768786589), (-22.2978566704, 11.1597253186))
        make_face()
        with BuildLine():
            ThreePointArc((-16.7315124708, 0), (-17.187564029, -3.5403527381), (-18.5259430378, -6.8495553856))
            ThreePointArc((-18.5259430378, -6.8495553856), (-11.9423283838, -11.4494068623), (-8.9795355769, -18.9142896011))
            ThreePointArc((-8.9795355769, -18.9142896011), (-1.0787766605, -15.6878187972), (7.2245709678, -17.6592455566))
            ThreePointArc((7.2245709678, -17.6592455566), (9.8360544956, -11.1023702751), (15.3194373733, -6.6588388088))
            ThreePointArc((15.3194373733, -6.6588388088), (14.3682112794, -4.4801180698), (13.8001739979, -2.1716578064))
            ThreePointArc((13.8001739979, -2.1716578064), (-10.6183557945, -9.0780735964), (0, 13.97))
            ThreePointArc((0, 13.97), (-1.8737816141, 16.4389987108), (-3.9856875286, 18.707669154))
            ThreePointArc((-3.9856875286, 18.707669154), (-6.6028466768, 19.7859324981), (-8.9489312631, 21.3696183761))
            ThreePointArc((-8.9489312631, 21.3696183761), (-12.176338273, 13.1852385957), (-19.6557605141, 8.5529096634))
            ThreePointArc((-19.6557605141, 8.5529096634), (-17.4827747316, 4.5194991517), (-16.7315124708, 0))
        make_face()
        with BuildLine():
            ThreePointArc((10.1054399692, -19.9703290409), (11.1933031436, -24.1840608478), (13.8303818001, -27.6459675748))
            ThreePointArc((13.8303818001, -27.6459675748), (12.5682038362, -23.5168297008), (10.1054399692, -19.9703290409))
        make_face()
        with BuildLine():
            ThreePointArc((-8.9489312631, 21.3696183761), (-11.1815901173, 23.7224965539), (-12.8114679451, 26.5268324014))
            ThreePointArc((-12.8114679451, 26.5268324014), (-12.1298214498, 24.3811201792), (-11.8993872476, 22.1415615255))
            ThreePointArc((-11.8993872476, 22.1415615255), (-14.9114630289, 14.5796686935), (-22.2978566704, 11.1597253186))
            ThreePointArc((-22.2978566704, 11.1597253186), (-20.8898491312, 9.9444538567), (-19.6557605141, 8.5529096634))
            ThreePointArc((-19.6557605141, 8.5529096634), (-12.176338273, 13.1852385957), (-8.9489312631, 21.3696183761))
        make_face()
        with BuildLine():
            ThreePointArc((17.1794728138, 9.3040991203), (11.288384172, 14.0684372874), (8.7507755499, 21.2073718043))
            ThreePointArc((8.7507755499, 21.2073718043), (2.6904728762, 18.3885640168), (-3.9856875286, 18.707669154))
            ThreePointArc((-3.9856875286, 18.707669154), (-1.8737816141, 16.4389987108), (0, 13.97))
            ThreePointArc((0, 13.97), (9.0780735964, 10.6183557945), (13.8001739979, 2.1716578064))
            ThreePointArc((13.8001739979, 2.1716578064), (14.9756604504, 5.9814851318), (17.1794728138, 9.3040991203))
        make_face()
        with BuildLine():
            ThreePointArc((28.1875230343, -10.9825146808), (29.9449474712, -10.7453830336), (31.6414161677, -10.2288890535))
            ThreePointArc((31.6414161677, -10.2288890535), (25.5373775383, -6.1397943205), (18.2026501198, -5.713464612))
            ThreePointArc((18.2026501198, -5.713464612), (19.2430531898, -7.149547312), (20.5007322161, -8.3997535096))
            ThreePointArc((20.5007322161, -8.3997535096), (24.5908538598, -8.956829671), (28.1875230343, -10.9825146808))
        make_face()
        with BuildLine():
            ThreePointArc((17.0468390827, -9.1533791368), (23.1508777121, -13.2424738699), (30.4856051307, -13.6688035784))
            ThreePointArc((30.4856051307, -13.6688035784), (29.4452020606, -12.2327208784), (28.1875230343, -10.9825146808))
            ThreePointArc((28.1875230343, -10.9825146808), (24.0974013906, -10.4254385194), (20.5007322161, -8.3997535096))
            ThreePointArc((20.5007322161, -8.3997535096), (18.7433077792, -8.6368851567), (17.0468390827, -9.1533791368))
        make_face()
        with BuildLine():
            ThreePointArc((20.5007322161, -8.3997535096), (19.2430531898, -7.149547312), (18.2026501198, -5.713464612))
            ThreePointArc((18.2026501198, -5.713464612), (16.7353010341, -6.1076412996), (15.3194373733, -6.6588388088))
            ThreePointArc((15.3194373733, -6.6588388088), (16.1152114383, -7.9531464375), (17.0468390827, -9.1533791368))
            ThreePointArc((17.0468390827, -9.1533791368), (18.7433077792, -8.6368851567), (20.5007322161, -8.3997535096))
        make_face()
        with BuildLine():
            ThreePointArc((15.3194373733, -6.6588388088), (9.8360544956, -11.1023702751), (7.2245709678, -17.6592455566))
            ThreePointArc((7.2245709678, -17.6592455566), (8.7417158778, -18.7191643403), (10.1054399692, -19.9703290409))
            ThreePointArc((10.1054399692, -19.9703290409), (11.8316523038, -13.442390454), (17.0468390827, -9.1533791368))
            ThreePointArc((17.0468390827, -9.1533791368), (16.1152114383, -7.9531464375), (15.3194373733, -6.6588388088))
        make_face()
        with BuildLine():
            ThreePointArc((20.5007322161, -8.3997535096), (24.0974013906, -10.4254385194), (28.1875230343, -10.9825146808))
            ThreePointArc((28.1875230343, -10.9825146808), (24.5908538598, -8.956829671), (20.5007322161, -8.3997535096))
        make_face()
        with BuildLine():
            ThreePointArc((13.8001739979, -2.1716578064), (13.6303479958, 0), (13.8001739979, 2.1716578064))
            ThreePointArc((13.8001739979, 2.1716578064), (9.0780735964, 10.6183557945), (0, 13.97))
            ThreePointArc((0, 13.97), (-10.6183557945, -9.0780735964), (13.8001739979, -2.1716578064))
        make_face()
        Circle(F0_R, mode=Mode.SUBTRACT)
    extrude(amount=F1_DEPTH)


solid = f1.part
